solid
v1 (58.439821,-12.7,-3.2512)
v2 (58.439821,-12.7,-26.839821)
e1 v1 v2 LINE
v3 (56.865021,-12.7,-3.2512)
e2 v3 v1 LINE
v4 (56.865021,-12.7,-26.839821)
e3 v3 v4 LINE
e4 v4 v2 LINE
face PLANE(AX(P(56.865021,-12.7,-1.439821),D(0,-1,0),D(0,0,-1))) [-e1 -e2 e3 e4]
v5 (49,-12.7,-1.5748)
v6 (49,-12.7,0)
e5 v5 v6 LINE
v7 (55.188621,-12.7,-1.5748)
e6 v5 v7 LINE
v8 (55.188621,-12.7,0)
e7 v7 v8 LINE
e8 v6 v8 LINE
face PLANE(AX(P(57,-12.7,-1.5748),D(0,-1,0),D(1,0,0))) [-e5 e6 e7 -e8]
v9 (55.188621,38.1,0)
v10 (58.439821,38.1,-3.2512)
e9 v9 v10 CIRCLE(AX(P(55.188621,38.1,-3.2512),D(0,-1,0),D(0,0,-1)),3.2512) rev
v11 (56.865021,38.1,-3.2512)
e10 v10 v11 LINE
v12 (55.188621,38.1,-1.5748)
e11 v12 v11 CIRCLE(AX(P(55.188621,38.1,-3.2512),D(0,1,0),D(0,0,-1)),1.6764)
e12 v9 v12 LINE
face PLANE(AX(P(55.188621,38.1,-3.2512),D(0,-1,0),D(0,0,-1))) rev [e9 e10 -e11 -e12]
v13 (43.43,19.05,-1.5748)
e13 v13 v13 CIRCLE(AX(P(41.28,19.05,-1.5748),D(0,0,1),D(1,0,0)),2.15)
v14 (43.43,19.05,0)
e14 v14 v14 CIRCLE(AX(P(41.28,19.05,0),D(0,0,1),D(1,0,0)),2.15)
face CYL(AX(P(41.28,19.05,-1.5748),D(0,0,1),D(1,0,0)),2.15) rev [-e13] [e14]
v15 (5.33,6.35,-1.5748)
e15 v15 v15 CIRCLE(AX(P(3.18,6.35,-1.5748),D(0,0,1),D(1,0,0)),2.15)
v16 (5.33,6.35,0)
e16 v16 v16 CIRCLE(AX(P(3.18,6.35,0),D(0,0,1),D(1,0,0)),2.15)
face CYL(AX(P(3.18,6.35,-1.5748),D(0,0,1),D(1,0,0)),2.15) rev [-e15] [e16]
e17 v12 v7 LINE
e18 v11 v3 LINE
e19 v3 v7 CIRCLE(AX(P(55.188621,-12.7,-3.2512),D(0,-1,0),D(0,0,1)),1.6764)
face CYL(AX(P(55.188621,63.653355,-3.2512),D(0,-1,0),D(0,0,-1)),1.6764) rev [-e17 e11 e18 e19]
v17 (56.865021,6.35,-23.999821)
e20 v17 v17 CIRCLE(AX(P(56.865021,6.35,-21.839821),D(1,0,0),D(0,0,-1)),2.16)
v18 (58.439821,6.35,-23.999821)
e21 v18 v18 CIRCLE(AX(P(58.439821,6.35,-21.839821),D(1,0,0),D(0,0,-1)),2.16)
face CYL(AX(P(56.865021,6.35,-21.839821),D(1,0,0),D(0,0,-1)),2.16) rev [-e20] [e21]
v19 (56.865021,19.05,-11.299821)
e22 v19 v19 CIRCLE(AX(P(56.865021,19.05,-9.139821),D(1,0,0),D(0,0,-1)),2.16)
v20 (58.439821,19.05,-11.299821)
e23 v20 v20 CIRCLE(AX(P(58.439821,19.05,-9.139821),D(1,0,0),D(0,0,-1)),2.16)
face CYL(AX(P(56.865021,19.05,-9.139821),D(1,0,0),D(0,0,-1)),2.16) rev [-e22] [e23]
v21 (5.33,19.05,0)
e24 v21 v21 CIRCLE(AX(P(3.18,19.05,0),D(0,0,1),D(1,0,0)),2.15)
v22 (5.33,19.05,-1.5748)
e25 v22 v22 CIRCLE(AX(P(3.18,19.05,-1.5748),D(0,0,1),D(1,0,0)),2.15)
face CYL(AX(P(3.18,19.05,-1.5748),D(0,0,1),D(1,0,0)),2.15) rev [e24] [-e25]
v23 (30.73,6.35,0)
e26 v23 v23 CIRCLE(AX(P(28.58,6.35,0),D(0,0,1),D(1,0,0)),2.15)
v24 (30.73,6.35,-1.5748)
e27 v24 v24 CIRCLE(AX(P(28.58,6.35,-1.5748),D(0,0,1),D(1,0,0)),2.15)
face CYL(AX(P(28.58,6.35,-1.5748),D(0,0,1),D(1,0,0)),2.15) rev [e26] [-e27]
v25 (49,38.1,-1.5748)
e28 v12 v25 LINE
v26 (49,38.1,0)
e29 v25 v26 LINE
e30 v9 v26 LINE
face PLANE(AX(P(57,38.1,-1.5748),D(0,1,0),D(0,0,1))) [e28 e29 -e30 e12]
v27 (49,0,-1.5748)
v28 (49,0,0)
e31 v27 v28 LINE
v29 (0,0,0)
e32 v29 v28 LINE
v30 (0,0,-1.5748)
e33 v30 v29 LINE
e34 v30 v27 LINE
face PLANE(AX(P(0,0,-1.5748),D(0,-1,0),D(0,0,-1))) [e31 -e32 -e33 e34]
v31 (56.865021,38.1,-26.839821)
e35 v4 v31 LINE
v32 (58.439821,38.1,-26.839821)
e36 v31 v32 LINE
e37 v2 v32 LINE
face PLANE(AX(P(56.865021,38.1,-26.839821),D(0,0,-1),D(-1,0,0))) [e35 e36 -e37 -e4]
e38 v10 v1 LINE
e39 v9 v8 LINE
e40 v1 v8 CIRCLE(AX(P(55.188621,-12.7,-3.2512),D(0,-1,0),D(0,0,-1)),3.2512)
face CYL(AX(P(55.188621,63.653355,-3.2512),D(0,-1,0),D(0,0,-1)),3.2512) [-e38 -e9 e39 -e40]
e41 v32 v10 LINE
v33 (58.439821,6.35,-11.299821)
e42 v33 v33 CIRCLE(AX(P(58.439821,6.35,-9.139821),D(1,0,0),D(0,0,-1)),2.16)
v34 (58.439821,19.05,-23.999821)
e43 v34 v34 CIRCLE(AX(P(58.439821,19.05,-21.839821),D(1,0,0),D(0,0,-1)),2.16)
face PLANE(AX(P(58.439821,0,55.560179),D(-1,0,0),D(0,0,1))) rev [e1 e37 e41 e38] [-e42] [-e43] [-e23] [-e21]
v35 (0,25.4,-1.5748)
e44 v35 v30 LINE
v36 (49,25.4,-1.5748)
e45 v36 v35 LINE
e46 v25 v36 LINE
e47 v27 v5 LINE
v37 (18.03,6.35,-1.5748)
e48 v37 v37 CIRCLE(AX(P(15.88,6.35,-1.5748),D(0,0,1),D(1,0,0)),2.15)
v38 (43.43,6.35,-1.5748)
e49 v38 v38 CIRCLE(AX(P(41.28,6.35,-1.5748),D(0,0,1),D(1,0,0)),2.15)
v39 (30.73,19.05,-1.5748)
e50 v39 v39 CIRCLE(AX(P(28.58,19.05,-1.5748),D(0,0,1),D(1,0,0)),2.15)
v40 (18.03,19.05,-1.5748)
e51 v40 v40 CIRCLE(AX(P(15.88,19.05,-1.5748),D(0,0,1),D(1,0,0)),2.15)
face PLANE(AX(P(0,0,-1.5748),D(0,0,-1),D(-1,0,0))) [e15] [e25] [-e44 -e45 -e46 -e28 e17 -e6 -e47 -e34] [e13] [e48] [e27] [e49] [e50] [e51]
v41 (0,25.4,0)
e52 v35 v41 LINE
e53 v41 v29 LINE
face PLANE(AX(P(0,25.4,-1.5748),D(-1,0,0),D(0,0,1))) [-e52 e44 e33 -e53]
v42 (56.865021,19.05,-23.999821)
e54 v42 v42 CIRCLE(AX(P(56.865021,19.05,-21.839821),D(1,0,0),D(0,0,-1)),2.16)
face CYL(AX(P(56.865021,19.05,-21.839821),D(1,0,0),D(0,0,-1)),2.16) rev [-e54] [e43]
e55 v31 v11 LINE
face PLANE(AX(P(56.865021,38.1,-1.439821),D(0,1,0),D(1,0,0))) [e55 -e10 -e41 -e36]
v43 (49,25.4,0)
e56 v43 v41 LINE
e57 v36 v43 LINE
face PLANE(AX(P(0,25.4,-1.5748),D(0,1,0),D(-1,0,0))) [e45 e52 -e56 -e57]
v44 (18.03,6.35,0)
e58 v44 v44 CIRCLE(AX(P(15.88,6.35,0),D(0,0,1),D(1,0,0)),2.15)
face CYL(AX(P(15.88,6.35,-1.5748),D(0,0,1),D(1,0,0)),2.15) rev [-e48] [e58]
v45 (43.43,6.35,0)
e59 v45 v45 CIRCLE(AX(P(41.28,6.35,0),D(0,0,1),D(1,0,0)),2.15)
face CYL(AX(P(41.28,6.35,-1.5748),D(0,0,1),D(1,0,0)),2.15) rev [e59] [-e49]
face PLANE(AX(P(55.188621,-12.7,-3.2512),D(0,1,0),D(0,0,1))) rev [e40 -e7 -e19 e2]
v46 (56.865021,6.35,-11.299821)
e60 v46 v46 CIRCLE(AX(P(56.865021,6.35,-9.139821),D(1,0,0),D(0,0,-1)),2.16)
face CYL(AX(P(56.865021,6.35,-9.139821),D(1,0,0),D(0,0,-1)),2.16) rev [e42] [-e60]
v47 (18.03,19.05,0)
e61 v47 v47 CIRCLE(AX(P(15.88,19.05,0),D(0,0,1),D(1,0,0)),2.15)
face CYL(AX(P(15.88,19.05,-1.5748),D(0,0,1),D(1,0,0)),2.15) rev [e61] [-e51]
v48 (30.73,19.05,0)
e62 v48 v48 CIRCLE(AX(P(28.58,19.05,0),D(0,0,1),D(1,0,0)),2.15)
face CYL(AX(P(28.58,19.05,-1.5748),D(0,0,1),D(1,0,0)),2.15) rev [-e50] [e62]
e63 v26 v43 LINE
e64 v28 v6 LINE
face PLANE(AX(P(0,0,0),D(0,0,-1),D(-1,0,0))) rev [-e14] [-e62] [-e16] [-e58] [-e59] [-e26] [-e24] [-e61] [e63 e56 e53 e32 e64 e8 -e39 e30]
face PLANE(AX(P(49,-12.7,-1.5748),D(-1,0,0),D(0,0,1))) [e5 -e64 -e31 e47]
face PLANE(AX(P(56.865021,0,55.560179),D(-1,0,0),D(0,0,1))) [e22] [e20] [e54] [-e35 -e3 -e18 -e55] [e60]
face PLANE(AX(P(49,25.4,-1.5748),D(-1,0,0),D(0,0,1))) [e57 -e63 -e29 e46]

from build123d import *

# Parameters (mm, degrees)
SKETCH1_R                  = 2.15
SKETCH1_R_2                = 2.16
BASE_FLANGE1_DEPTH         = 1.5748
SKETCHED_START             = 58.096428764
SKETCHED_BEND1_OUTLINE_W   = 50.8
SKETCHED_BEND1_OUTLINE_H   = 1.5748
SKETCHED_BEND1_DEPTH       = 24.303571236
SKETCHED_START_2           = 56.865020508
SKETCHED_BEND1_2_OUTLINE_W = 50.8
SKETCHED_BEND1_2_OUTLINE_H = 25.265020508
SKETCHED_BEND1_2_OUTLINE_R = 2.16
SKETCHED_BEND1_2_DEPTH     = 0.589203492
SKETCHED_START_3           = 55.188620508
SKETCHED_BEND1_3_OUTLINE_W = 50.8
SKETCHED_BEND1_3_OUTLINE_H = 25.265020508
SKETCHED_BEND1_3_OUTLINE_R = 2.16
SKETCHED_BEND1_3_DEPTH     = 3.2512
SKETCHED_START_4           = -12.7
SKETCHED_BEND1_4_DEPTH     = 50.8


with BuildPart() as part:
    # Base-Flange1: sheet metal written as solids
    # Sketch1 → Base-Flange1 (new body)
    with BuildSketch(Plane.XY):
        Polygon((49, 25.4), (49, 38.1), (57, 38.1), (82.4, 38.1), (82.4, -12.7), (57, -12.7), (49, -12.7), (49, 0), (0, 0), (0, 25.4), align=None)
        with Locations((3.18, 19.05)):
            Circle(SKETCH1_R, mode=Mode.SUBTRACT)
        with Locations((15.88, 19.05)):
            Circle(SKETCH1_R, mode=Mode.SUBTRACT)
        with Locations((28.58, 19.05)):
            Circle(SKETCH1_R, mode=Mode.SUBTRACT)
        with Locations((15.88, 6.35)):
            Circle(SKETCH1_R, mode=Mode.SUBTRACT)
        with Locations((28.58, 6.35)):
            Circle(SKETCH1_R, mode=Mode.SUBTRACT)
        with Locations((3.18, 6.35)):
            Circle(SKETCH1_R, mode=Mode.SUBTRACT)
        with Locations((41.28, 19.05)):
            Circle(SKETCH1_R, mode=Mode.SUBTRACT)
        with Locations((41.28, 6.35)):
            Circle(SKETCH1_R, mode=Mode.SUBTRACT)
        with Locations((64.7, 19.05)):
            Circle(SKETCH1_R_2, mode=Mode.SUBTRACT)
        with Locations((77.4, 19.05)):
            Circle(SKETCH1_R_2, mode=Mode.SUBTRACT)
        with Locations((64.7, 6.35)):
            Circle(SKETCH1_R_2, mode=Mode.SUBTRACT)
        with Locations((77.4, 6.35)):
            Circle(SKETCH1_R_2, mode=Mode.SUBTRACT)
    extrude(amount=-BASE_FLANGE1_DEPTH)

    # Sketched Bend1: read off the stored shape, not the designer's step
    # Sketched Bend1 outline → Sketched Bend1 (cut)
    with BuildSketch(Plane.YZ.offset(SKETCHED_START)):
        with Locations((12.7, -0.7874)):
            Rectangle(SKETCHED_BEND1_OUTLINE_W, SKETCHED_BEND1_OUTLINE_H)
    extrude(amount=SKETCHED_BEND1_DEPTH, mode=Mode.SUBTRACT)

    # Sketched Bend1 2 outline → Sketched Bend1 2 (add)
    with BuildSketch(Plane.YZ.offset(SKETCHED_START_2)):
        with Locations((12.7, -14.207310254)):
            Rectangle(SKETCHED_BEND1_2_OUTLINE_W, SKETCHED_BEND1_2_OUTLINE_H)
        with Locations((6.35, -21.839820508)):
            Circle(SKETCHED_BEND1_2_OUTLINE_R, mode=Mode.SUBTRACT)
        with Locations((19.05, -21.839820508)):
            Circle(SKETCHED_BEND1_2_OUTLINE_R, mode=Mode.SUBTRACT)
        with Locations((6.35, -9.139820508)):
            Circle(SKETCHED_BEND1_2_OUTLINE_R, mode=Mode.SUBTRACT)
        with Locations((19.05, -9.139820508)):
            Circle(SKETCHED_BEND1_2_OUTLINE_R, mode=Mode.SUBTRACT)
    extrude(amount=SKETCHED_BEND1_2_DEPTH)

    # Sketched Bend1 3 outline → Sketched Bend1 3 (add)
    with BuildSketch(Plane.YZ.offset(SKETCHED_START_3)):
        with Locations((12.7, -14.207310254)):
            Rectangle(SKETCHED_BEND1_3_OUTLINE_W, SKETCHED_BEND1_3_OUTLINE_H)
        with Locations((6.35, -21.839820508)):
            Circle(SKETCHED_BEND1_3_OUTLINE_R, mode=Mode.SUBTRACT)
        with Locations((19.05, -21.839820508)):
            Circle(SKETCHED_BEND1_3_OUTLINE_R, mode=Mode.SUBTRACT)
        with Locations((6.35, -9.139820508)):
            Circle(SKETCHED_BEND1_3_OUTLINE_R, mode=Mode.SUBTRACT)
        with Locations((19.05, -9.139820508)):
            Circle(SKETCHED_BEND1_3_OUTLINE_R, mode=Mode.SUBTRACT)
    extrude(amount=SKETCHED_BEND1_3_DEPTH)

    # Sketched Bend1 4 outline → Sketched Bend1 4 (cut)
    with BuildSketch(Plane(origin=(0, 0, 0), x_dir=(1, 0, 0), z_dir=(0, 1, 0)).offset(SKETCHED_START_4)):
        with BuildLine():
            Line((56.865020508, 3.2512), (56.865020508, 26.839820508))
            Line((56.865020508, 26.839820508), (55.188620508, 26.839820508))
            Line((55.188620508, 26.839820508), (55.188620508, 1.5748))
            ThreePointArc((55.188620508, 1.5748), (56.374014316, 2.065806192), (56.865020508, 3.2512))
        make_face()
        with BuildLine():
            Line((58.439820508, 1.5748), (58.439820508, 3.2512))
            ThreePointArc((58.439820508, 3.2512), (57.487566075, 0.952254433), (55.188620508, 0))
            Line((55.188620508, 0), (58.096428764, 0))
            Line((58.096428764, 0), (58.096428764, 1.5748))
            Line((58.096428764, 1.5748), (58.439820508, 1.5748))
        make_face()
    extrude(amount=SKETCHED_BEND1_4_DEPTH, mode=Mode.SUBTRACT)


solid = part.part
